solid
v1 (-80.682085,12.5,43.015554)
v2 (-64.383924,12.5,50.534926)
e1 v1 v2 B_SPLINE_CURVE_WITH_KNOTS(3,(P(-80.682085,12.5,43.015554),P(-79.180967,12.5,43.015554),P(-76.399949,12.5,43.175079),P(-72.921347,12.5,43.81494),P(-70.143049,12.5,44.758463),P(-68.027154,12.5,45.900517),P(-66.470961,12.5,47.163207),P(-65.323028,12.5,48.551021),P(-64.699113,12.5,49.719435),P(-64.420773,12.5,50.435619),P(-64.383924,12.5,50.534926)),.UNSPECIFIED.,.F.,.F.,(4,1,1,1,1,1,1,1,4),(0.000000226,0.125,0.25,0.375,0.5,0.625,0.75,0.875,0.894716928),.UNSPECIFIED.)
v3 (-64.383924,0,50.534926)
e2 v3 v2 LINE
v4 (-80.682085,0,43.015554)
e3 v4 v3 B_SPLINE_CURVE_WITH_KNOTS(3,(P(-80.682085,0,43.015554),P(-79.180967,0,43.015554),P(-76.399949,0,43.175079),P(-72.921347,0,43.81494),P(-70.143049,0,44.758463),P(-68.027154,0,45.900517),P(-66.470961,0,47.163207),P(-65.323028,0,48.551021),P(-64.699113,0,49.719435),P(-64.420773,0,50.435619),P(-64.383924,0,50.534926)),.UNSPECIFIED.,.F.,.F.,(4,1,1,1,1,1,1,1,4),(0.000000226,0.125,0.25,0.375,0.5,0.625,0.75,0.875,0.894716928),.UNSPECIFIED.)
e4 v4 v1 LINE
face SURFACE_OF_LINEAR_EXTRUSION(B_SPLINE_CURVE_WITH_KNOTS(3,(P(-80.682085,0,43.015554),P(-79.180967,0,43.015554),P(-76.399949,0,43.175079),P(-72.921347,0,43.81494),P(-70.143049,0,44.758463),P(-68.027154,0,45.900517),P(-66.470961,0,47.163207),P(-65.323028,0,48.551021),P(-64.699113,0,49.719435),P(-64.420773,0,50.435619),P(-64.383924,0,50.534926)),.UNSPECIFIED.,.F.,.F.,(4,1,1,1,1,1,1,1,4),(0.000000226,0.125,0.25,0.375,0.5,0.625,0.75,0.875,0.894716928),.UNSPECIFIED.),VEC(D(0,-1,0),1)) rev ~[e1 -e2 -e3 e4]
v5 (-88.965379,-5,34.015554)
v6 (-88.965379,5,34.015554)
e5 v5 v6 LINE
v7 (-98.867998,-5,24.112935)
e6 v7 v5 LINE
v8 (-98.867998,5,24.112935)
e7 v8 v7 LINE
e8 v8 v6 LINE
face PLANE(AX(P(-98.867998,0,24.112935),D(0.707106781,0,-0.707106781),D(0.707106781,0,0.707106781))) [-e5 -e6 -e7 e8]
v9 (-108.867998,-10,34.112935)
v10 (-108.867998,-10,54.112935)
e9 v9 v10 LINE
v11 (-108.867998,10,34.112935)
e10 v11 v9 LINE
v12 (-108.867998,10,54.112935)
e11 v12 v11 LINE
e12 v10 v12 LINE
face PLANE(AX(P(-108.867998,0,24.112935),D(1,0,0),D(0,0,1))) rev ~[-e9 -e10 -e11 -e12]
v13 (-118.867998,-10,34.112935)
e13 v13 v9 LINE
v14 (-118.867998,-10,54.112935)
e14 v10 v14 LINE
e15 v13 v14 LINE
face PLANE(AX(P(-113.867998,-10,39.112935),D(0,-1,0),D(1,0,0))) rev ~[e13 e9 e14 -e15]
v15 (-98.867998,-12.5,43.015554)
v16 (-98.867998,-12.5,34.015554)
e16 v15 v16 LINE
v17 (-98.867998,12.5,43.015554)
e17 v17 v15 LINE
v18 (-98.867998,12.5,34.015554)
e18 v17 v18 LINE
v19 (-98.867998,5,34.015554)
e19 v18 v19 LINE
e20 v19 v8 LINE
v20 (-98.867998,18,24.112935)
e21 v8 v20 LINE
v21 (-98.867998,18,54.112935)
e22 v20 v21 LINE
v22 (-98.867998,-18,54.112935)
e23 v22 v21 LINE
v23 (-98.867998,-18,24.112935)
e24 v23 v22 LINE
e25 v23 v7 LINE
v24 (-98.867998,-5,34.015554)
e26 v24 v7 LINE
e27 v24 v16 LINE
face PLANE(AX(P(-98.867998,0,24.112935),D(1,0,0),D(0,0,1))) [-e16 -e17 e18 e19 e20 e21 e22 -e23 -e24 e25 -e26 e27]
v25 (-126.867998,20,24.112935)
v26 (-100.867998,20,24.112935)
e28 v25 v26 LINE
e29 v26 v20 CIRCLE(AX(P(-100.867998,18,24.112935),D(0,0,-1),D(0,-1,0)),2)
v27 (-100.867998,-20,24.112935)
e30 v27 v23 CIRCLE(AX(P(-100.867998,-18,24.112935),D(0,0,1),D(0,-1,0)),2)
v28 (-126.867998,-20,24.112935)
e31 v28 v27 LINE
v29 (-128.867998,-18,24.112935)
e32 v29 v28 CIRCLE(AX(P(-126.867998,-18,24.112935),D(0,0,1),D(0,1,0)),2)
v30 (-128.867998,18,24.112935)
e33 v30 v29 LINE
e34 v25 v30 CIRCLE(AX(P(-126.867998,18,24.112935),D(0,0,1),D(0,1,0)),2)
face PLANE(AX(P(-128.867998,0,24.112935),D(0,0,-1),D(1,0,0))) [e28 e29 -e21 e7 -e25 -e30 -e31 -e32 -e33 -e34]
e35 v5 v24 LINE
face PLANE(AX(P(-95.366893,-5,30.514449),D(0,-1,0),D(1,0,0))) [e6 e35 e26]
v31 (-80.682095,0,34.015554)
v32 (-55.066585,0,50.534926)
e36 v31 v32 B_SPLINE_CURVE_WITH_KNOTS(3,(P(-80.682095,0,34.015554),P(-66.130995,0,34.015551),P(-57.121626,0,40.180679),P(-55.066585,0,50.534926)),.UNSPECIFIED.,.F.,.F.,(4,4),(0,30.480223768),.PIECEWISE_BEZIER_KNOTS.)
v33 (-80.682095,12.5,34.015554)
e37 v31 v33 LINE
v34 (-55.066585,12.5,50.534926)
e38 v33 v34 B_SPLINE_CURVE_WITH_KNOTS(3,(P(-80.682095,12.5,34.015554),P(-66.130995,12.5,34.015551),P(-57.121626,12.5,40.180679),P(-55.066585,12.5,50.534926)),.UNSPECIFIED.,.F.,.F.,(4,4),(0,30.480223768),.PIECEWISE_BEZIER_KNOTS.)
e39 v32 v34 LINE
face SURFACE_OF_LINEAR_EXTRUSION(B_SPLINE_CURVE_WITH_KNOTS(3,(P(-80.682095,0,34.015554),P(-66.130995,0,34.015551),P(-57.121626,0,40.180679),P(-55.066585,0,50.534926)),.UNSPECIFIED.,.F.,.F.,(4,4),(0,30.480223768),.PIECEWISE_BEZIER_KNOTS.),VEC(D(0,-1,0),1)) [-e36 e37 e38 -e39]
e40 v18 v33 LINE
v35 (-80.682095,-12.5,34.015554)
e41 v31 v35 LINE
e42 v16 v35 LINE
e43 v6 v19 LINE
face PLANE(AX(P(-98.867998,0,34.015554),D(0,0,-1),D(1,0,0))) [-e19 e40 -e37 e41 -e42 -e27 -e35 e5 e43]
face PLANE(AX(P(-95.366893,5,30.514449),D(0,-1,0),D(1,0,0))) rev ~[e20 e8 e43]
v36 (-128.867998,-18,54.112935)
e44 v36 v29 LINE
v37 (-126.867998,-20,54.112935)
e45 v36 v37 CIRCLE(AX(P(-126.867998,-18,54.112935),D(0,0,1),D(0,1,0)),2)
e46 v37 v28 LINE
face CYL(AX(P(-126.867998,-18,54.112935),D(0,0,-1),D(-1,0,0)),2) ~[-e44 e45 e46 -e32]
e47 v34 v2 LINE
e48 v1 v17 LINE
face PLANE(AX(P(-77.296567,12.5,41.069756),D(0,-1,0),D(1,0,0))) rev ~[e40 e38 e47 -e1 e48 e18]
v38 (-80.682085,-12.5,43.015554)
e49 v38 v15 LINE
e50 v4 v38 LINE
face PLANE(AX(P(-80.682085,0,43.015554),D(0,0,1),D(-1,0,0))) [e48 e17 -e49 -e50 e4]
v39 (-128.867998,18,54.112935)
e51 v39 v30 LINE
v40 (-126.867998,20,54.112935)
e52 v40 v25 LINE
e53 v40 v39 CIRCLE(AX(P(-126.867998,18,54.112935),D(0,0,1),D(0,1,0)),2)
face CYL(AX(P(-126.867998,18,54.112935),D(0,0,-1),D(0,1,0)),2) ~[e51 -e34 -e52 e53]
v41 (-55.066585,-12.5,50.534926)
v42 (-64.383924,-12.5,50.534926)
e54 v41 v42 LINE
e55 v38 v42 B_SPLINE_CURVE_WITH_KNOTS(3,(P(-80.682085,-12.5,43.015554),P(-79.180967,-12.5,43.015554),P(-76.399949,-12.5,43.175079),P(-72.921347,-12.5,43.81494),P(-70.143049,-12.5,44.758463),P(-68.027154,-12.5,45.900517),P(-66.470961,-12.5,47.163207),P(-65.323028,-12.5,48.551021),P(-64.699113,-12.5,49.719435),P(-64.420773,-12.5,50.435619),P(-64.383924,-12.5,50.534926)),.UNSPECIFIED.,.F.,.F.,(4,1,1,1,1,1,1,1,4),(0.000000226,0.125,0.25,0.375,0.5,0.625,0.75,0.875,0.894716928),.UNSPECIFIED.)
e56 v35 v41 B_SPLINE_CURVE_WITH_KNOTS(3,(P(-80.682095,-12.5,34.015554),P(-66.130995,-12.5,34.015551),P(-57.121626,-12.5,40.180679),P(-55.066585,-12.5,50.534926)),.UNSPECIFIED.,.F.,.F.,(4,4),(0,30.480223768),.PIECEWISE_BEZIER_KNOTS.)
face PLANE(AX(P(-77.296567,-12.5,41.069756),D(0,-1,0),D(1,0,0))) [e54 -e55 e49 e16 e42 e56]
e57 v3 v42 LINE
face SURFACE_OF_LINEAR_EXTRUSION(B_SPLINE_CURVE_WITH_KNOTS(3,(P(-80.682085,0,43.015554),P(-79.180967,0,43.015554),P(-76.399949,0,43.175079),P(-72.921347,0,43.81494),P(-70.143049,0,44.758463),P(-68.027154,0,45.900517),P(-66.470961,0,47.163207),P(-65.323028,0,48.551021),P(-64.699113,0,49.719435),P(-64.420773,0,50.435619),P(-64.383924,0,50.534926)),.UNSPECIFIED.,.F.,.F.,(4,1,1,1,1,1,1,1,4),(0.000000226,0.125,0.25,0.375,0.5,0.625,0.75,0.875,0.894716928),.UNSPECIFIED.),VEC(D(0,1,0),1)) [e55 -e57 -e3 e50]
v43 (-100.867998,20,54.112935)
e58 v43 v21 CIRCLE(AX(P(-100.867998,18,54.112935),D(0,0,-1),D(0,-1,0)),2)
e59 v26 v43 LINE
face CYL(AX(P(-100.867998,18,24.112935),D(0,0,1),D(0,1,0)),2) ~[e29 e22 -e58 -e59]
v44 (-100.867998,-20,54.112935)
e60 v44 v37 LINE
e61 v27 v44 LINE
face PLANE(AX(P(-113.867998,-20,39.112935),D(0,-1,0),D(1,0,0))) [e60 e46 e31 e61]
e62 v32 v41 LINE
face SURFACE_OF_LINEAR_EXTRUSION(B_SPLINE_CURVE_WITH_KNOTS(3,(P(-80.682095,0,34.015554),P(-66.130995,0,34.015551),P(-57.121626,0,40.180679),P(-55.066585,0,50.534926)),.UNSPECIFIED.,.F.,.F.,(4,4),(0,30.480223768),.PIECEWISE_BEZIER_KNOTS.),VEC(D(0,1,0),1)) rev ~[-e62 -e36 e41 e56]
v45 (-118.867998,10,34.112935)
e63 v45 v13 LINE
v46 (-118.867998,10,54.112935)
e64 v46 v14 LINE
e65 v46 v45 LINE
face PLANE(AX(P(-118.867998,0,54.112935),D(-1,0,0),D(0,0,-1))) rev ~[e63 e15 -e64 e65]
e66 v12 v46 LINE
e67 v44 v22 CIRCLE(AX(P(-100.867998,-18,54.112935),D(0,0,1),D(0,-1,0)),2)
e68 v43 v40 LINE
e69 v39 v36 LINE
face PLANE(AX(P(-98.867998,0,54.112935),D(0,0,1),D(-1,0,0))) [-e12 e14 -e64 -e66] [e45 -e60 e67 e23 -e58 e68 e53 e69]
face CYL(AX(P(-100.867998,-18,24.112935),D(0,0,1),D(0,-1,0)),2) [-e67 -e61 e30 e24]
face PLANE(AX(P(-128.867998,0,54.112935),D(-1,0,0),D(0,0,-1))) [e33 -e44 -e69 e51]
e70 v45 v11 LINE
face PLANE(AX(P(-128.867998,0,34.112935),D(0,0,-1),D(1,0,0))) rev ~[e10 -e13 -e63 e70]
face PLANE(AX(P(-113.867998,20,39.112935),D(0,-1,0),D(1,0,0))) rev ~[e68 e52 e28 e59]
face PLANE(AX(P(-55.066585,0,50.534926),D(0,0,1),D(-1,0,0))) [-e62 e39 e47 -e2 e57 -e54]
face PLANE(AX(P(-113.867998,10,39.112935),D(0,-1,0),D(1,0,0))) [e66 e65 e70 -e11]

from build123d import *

# Parameters (mm, degrees)
F1_DEPTH     = 20
F2_DEPTH     = 12.5
F3_DEPTH     = 5
F4_R         = 2
F5_T         = 10
F5_T3_DEPTH  = 29.9026188965
F5_T5_DEPTH  = 27.5
F5_T7_DEPTH  = 27.5
F5_T9_DEPTH  = 29
F5_T11_DEPTH = 45
F5_T13_DEPTH = 29.9026188965
F5_T15_DEPTH = 30


# Not quite as in the source:
# - ends of sketch curves that miss each other by under 0.0002 mm in the source are joined
# - a shell that OpenCascade refuses in one call is made with other operations: the cavity is built on its own and cut out


with BuildPart() as f1:
    # F0 (on Front) → F1 (new body, symmetric)
    with BuildSketch(Plane.XZ):
        Polygon((-98.8679975982, 54.1129348578), (-128.8679975982, 54.1129348578), (-128.8679975982, 24.1129348578), (-98.8679975982, 24.1129348578), (-98.8679975982, 34.0155537543), (-98.8679975982, 43.0155537543), align=None)
    extrude(amount=F1_DEPTH, both=True)

    # F0 (on Front) → F2 (join, symmetric)
    with BuildSketch(Plane.XZ):
        with BuildLine():
            Line((-80.6820849815, 43.0155537543), (-98.8679975982, 43.0155537543))
            Line((-98.8679975982, 43.0155537543), (-98.8679975982, 34.0155537543))
            Line((-98.8679975982, 34.0155537543), (-88.9653787017, 34.0155537543))
            Line((-88.9653787017, 34.0155537543), (-80.682094855, 34.0155537543))
            add(Edge.make_bspline(
                [(-80.682094855, 34.0155537543), (-66.1309954288, 34.0155509655), (-57.1216260093, 40.1806794107), (-55.0665845173, 50.5349263549)],
                knots=[0, 0, 0, 0, 30.4802237684, 30.4802237684, 30.4802237684, 30.4802237684], degree=3))
            Line((-55.0665845173, 50.5349263549), (-64.3839240074, 50.5349263549))
            add(Edge.make_bspline(
                [(-80.6820849815, 43.0155537543), (-79.1809668737, 43.0155537553), (-76.3999490421, 43.1750788515), (-72.9213473732, 43.8149397212), (-70.1430488739, 44.758463036), (-68.0271542887, 45.9005167962), (-66.4709613794, 47.1632066722), (-65.3230275472, 48.5510213805), (-64.6991129712, 49.71943479), (-64.4207731634, 50.4356187157), (-64.3839240074, 50.5349263549)],
                knots=[2.262e-07, 2.262e-07, 2.262e-07, 2.262e-07, 0.125, 0.25, 0.375, 0.5, 0.625, 0.75, 0.875, 0.8947169283, 0.8947169283, 0.8947169283, 0.8947169283], degree=3))
        make_face()
    extrude(amount=F2_DEPTH, both=True)

    # F0 (on Front) → F3 (join, symmetric)
    with BuildSketch(Plane.XZ):
        Polygon((-98.8679975982, 34.0155537543), (-98.8679975982, 24.1129348578), (-88.9653787017, 34.0155537543), align=None)
    extrude(amount=F3_DEPTH, both=True)

    # F4
    f4_edges = [f1.edges().sort_by_distance(p)[0] for p in [
        (-98.867998, -20, 39.112935),
        (-128.867998, -20, 39.112935),
        (-98.867998, 20, 39.112935),
        (-128.867998, 20, 39.112935),
    ]]
    fillet(f4_edges, radius=F4_R)

    # F5: shell of thickness 10, made by hand


with BuildPart() as f5_core1:
    # F5_t2: copy of F1
    add(f1.part)

    # the walls: a layer under each face that stays
    f5_faces = [f5_core1.faces().sort_by_distance(p)[0] for p in [
        (-113.8679975982, 20, 39.1129348578),
        (-98.8679975982, 12, 29.1129348578),
        (-128.8679975982, 0, 39.1129348578),
        (-113.8679975982, -20, 39.1129348578),
        (-113.8679975982, 0, 24.1129348578),
        (-97.2175611154, -5, 29.0642443061),
        (-97.2175611154, 5, 29.0642443061),
        (-95.8370138076, 8.3333333333, 34.0155537543),
        (-76.9672910577, -12.5, 42.2752386602),
        (-76.9672910577, 12.5, 42.2752386602),
        (-89.7750412898, 0, 43.0155537543),
        (-93.9166881499, 0, 29.0642443061),
        (-63.1883179608, -6.25, 38.3923964047),
        (-63.1883179608, 6.25, 38.3923964047),
        (-59.7252542624, 0, 50.5349263549),
        (-68.9445639905, -6.25, 45.4259334498),
        (-68.9445639905, 6.25, 45.4259334498),
    ]]
    thicken(f5_faces, amount=-F5_T, mode=Mode.SUBTRACT)

    # F5_s4 → F5_t3 (cut)
    with BuildSketch(Plane.XY.offset(14.1129348578)):
        Polygon((-98.7679975982, -5.1), (-108.8679975982, -5), (-108.8679975982, 5), (-98.8679975982, 5), align=None)
        Polygon((-98.7679975982, 5.1), (-108.8679975982, 5), (-108.8679975982, -5), (-98.8679975982, -5), align=None)
    extrude(amount=F5_T3_DEPTH, mode=Mode.SUBTRACT)

    # F5_s6 → F5_t5 (cut)
    with BuildSketch(Plane.XZ.offset(-5)):
        Polygon((-98.7679975982, 33.9155537543), (-108.8679975982, 34.0155537543), (-108.8679975982, 44.0155537543), (-98.8679975982, 44.0155537543), align=None)
    extrude(amount=F5_T5_DEPTH, mode=Mode.SUBTRACT)

    # F5_s8 → F5_t7 (cut)
    with BuildSketch(Plane.XZ.offset(-22.5)):
        Polygon((-98.7679975982, 33.9155537543), (-108.8679975982, 34.0155537543), (-108.8679975982, 44.0155537543), (-98.8679975982, 44.0155537543), align=None)
    extrude(amount=F5_T7_DEPTH, mode=Mode.SUBTRACT)

    # F5_s10 → F5_t9 (cut)
    with BuildSketch(Plane.XY.offset(24.0155537543)):
        Polygon((-98.7679975982, -12.6), (-108.8679975982, -12.5), (-108.8679975982, -2.5), (-98.8679975982, -2.5), align=None)
        Polygon((-98.7679975982, 12.6), (-108.8679975982, 12.5), (-108.8679975982, 2.5), (-98.8679975982, 2.5), align=None)
    extrude(amount=F5_T9_DEPTH, mode=Mode.SUBTRACT)

    # F5_s12 → F5_t11 (cut)
    with BuildSketch(Plane.XZ.offset(-22.5)):
        Polygon((-98.7679975982, 43.1155537543), (-108.8679975982, 43.0155537543), (-108.8679975982, 33.0155537543), (-98.8679975982, 33.0155537543), align=None)
    extrude(amount=F5_T11_DEPTH, mode=Mode.SUBTRACT)

    # F5_s14 → F5_t13 (cut)
    with BuildSketch(Plane.YZ.offset(-108.8679975982)):
        Polygon((-5.1, 33.9155537543), (5, 34.0155537543), (5, 44.0155537543), (-5, 44.0155537543), align=None)
        Polygon((5.1, 33.9155537543), (-5, 34.0155537543), (-5, 44.0155537543), (5, 44.0155537543), align=None)
    extrude(amount=F5_T13_DEPTH, mode=Mode.SUBTRACT)

    # F5_s16 → F5_t15 (cut)
    with BuildSketch(Plane.XZ.offset(-15)):
        Polygon((-88.8946680236, 33.8448430762), (-88.9653787017, 44.0155537543), (-93.1075143254, 44.0155537543), (-96.0364465136, 41.0866215662), align=None)
    extrude(amount=F5_T15_DEPTH, mode=Mode.SUBTRACT)


with BuildPart() as f1_1:
    add(f1.part)

    # what is left inside the walls is the cavity
    f5_cavity = [f5_core1.part.solids().sort_by_distance(p)[0] for p in [
        (-118.767998, 3.333333, 44.112935),
    ]]
    add(f5_cavity, mode=Mode.SUBTRACT)


solid = f1_1.part
